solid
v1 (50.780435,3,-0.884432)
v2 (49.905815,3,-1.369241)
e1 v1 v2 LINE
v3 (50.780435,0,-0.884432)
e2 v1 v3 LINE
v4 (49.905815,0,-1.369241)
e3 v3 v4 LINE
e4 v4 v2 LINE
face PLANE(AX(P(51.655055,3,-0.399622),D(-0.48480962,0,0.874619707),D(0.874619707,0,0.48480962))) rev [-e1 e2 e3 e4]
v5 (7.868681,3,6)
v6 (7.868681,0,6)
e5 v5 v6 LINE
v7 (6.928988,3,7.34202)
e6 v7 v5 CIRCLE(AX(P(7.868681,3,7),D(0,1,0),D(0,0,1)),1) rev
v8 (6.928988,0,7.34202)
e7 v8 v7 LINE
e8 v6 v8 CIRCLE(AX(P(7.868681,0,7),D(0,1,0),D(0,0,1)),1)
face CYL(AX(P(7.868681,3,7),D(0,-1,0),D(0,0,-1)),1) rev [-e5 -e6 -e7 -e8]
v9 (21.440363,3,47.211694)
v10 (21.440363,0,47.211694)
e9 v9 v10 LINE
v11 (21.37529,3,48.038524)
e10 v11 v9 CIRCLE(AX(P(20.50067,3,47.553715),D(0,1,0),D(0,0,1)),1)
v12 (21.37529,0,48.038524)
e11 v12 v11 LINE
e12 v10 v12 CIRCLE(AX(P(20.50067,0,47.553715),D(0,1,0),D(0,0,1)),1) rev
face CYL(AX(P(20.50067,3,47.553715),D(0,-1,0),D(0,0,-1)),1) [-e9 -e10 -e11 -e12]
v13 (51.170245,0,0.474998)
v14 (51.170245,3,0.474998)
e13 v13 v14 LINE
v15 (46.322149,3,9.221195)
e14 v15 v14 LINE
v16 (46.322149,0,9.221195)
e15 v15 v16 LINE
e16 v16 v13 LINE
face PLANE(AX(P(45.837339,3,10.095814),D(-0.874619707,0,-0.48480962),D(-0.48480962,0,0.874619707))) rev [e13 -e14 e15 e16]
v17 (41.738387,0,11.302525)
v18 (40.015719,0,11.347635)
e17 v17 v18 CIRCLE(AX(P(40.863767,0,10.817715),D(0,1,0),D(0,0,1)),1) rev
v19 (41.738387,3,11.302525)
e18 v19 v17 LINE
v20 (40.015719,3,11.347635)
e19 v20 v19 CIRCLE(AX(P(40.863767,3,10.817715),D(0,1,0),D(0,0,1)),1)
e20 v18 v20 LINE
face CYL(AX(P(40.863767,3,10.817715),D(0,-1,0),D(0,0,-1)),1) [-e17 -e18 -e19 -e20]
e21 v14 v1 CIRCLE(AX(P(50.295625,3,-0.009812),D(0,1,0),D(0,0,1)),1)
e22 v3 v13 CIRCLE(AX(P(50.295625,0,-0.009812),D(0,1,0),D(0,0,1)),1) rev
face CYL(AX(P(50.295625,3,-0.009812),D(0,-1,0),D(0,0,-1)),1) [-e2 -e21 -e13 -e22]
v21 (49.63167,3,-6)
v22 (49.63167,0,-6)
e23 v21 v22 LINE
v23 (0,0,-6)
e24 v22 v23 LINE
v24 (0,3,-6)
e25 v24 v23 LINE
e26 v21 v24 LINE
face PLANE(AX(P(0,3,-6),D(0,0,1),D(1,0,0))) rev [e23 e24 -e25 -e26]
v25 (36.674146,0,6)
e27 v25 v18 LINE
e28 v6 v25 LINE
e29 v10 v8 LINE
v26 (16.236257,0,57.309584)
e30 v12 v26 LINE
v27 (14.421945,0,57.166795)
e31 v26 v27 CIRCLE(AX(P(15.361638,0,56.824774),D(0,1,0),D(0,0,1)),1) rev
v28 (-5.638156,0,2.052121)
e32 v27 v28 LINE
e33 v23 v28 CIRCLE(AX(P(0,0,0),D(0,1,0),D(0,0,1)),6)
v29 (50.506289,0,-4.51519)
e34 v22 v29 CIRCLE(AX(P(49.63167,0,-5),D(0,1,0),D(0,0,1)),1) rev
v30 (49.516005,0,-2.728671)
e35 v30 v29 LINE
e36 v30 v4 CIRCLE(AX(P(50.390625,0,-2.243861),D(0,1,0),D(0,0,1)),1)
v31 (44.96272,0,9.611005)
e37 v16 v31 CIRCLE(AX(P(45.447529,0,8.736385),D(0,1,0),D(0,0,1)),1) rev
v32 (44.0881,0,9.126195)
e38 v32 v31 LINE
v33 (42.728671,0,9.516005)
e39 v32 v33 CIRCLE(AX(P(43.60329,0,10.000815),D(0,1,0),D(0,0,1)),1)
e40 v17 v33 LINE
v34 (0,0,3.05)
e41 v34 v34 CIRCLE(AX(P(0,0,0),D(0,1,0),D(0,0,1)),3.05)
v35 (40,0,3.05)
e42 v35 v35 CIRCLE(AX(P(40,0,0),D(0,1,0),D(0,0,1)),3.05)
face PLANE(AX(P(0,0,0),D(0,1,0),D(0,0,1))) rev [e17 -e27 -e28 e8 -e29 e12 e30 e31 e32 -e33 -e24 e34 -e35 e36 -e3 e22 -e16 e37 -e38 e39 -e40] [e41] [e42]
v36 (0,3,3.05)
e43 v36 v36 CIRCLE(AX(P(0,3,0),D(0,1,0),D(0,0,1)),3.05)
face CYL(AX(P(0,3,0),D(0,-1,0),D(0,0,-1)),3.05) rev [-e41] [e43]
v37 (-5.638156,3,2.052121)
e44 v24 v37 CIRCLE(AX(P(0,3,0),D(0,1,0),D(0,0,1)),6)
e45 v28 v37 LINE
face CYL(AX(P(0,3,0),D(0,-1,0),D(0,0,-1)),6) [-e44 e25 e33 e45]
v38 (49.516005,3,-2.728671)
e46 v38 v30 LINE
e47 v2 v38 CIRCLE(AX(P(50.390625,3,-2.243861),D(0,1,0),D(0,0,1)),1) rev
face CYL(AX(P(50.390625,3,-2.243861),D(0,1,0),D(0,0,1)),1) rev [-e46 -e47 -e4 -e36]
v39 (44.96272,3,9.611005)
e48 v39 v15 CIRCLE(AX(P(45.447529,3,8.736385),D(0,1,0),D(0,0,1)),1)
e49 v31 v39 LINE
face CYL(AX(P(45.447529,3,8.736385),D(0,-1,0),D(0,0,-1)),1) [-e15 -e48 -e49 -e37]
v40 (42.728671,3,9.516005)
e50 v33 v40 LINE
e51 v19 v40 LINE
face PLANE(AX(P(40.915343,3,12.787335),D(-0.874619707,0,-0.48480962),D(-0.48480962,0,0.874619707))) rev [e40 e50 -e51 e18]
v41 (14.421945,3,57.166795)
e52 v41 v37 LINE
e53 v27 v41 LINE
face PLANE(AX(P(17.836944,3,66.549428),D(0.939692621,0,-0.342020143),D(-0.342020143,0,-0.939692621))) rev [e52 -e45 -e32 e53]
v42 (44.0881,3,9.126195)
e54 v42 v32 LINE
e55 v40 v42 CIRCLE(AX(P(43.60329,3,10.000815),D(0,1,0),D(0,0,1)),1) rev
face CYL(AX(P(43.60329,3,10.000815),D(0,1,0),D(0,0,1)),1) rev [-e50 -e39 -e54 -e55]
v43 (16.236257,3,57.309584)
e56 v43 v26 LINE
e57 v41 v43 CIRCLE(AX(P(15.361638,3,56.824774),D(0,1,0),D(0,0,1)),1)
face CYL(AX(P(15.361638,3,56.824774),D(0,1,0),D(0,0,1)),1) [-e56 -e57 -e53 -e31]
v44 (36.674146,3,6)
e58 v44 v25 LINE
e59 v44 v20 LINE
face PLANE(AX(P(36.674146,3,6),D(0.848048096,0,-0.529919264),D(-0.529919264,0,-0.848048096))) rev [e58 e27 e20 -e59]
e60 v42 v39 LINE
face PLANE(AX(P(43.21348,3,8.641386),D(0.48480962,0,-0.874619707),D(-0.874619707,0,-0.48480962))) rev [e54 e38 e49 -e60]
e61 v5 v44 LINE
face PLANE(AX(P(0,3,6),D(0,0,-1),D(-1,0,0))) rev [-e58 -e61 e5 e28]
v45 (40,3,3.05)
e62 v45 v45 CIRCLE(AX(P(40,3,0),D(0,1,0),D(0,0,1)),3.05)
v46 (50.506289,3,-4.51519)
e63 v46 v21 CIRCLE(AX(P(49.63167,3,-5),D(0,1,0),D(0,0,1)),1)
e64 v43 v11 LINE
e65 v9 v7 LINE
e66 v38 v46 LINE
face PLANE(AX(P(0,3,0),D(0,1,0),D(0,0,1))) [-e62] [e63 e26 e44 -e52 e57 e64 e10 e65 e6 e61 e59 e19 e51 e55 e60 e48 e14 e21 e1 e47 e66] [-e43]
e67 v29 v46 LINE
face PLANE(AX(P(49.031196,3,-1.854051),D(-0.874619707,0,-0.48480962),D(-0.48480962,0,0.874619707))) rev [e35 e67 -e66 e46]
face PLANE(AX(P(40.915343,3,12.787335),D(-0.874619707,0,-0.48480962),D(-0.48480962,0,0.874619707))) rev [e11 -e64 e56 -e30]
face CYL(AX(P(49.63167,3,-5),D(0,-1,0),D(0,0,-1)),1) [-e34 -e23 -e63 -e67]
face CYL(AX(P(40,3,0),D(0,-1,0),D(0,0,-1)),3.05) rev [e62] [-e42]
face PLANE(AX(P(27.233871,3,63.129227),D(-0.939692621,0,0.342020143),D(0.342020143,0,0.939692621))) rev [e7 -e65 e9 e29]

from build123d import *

# Parameters (mm, degrees)
SKETCH1_R           = 3.05
BOSS_EXTRUDE1_DEPTH = 3
BOSS_EXTRUDE2_DEPTH = 3
FILLET1_R           = 1


# Read off the part's stored shape, not the designer's step: Boss-Extrude2
with BuildPart() as part:
    # Sketch1 → Boss-Extrude1 (new body)
    with BuildSketch(Plane(origin=(0, 0, 0), x_dir=(1, 0, 0), z_dir=(0, 1, 0))):
        with BuildLine():
            Line((0, 6), (40, 6))
            Line((40, 6), (51.329332784, 6))
            Line((51.329332784, 6), (49.031195671, 1.854050901))
            Line((49.031195671, 1.854050901), (51.655054793, 0.39962204))
            Line((51.655054793, 0.39962204), (45.83733935, -10.095814445))
            Line((45.83733935, -10.095814445), (43.213480228, -8.641385585))
            Line((43.213480228, -8.641385585), (40.915343116, -12.787334683))
            Line((40.915343116, -12.787334683), (36.674145691, -6))
            Line((36.674145691, -6), (0, -6))
            ThreePointArc((0, -6), (-6, 0), (0, 6))
        make_face()
        with Locations(Location((0, 0, 0), (0, 0, 270))):
            Circle(SKETCH1_R, mode=Mode.SUBTRACT)
        with Locations(Location((40, 0, 0), (0, 0, 270))):
            Circle(SKETCH1_R, mode=Mode.SUBTRACT)
    extrude(amount=BOSS_EXTRUDE1_DEPTH)

    # Boss-Extrude2 outline → Boss-Extrude2 (add)
    with BuildSketch(Plane(origin=(0, 0, 0), x_dir=(1, 0, 0), z_dir=(0, 1, 0))):
        with BuildLine():
            Line((15.172439685, -59.228761833), (21.596230146, -47.639937071))
            Line((21.596230146, -47.639937071), (6.440532496, -6))
            Line((6.440532496, -6), (0, -6))
            ThreePointArc((0, -6), (-3.441458618, -4.914912266), (-5.638155725, -2.05212086))
            Line((-5.638155725, -2.05212086), (15.172439685, -59.228761833))
        make_face()
    extrude(amount=BOSS_EXTRUDE2_DEPTH)

    # Fillet1
    fillet1_edges = [part.edges().sort_by_distance(p)[0] for p in [
        (51.329332784, 1.5, -6),
        (49.031195671, 1.5, -1.854050901),
        (51.655054793, 1.5, -0.39962204),
        (45.83733935, 1.5, 10.095814445),
        (43.213480228, 1.5, 8.641385585),
        (40.915343116, 1.5, 12.787334683),
        (6.440532496, 1.5, 6),
        (21.596230146, 1.5, 47.639937071),
        (15.172439685, 1.5, 59.228761833),
    ]]
    fillet(fillet1_edges, radius=FILLET1_R)


solid = part.part
